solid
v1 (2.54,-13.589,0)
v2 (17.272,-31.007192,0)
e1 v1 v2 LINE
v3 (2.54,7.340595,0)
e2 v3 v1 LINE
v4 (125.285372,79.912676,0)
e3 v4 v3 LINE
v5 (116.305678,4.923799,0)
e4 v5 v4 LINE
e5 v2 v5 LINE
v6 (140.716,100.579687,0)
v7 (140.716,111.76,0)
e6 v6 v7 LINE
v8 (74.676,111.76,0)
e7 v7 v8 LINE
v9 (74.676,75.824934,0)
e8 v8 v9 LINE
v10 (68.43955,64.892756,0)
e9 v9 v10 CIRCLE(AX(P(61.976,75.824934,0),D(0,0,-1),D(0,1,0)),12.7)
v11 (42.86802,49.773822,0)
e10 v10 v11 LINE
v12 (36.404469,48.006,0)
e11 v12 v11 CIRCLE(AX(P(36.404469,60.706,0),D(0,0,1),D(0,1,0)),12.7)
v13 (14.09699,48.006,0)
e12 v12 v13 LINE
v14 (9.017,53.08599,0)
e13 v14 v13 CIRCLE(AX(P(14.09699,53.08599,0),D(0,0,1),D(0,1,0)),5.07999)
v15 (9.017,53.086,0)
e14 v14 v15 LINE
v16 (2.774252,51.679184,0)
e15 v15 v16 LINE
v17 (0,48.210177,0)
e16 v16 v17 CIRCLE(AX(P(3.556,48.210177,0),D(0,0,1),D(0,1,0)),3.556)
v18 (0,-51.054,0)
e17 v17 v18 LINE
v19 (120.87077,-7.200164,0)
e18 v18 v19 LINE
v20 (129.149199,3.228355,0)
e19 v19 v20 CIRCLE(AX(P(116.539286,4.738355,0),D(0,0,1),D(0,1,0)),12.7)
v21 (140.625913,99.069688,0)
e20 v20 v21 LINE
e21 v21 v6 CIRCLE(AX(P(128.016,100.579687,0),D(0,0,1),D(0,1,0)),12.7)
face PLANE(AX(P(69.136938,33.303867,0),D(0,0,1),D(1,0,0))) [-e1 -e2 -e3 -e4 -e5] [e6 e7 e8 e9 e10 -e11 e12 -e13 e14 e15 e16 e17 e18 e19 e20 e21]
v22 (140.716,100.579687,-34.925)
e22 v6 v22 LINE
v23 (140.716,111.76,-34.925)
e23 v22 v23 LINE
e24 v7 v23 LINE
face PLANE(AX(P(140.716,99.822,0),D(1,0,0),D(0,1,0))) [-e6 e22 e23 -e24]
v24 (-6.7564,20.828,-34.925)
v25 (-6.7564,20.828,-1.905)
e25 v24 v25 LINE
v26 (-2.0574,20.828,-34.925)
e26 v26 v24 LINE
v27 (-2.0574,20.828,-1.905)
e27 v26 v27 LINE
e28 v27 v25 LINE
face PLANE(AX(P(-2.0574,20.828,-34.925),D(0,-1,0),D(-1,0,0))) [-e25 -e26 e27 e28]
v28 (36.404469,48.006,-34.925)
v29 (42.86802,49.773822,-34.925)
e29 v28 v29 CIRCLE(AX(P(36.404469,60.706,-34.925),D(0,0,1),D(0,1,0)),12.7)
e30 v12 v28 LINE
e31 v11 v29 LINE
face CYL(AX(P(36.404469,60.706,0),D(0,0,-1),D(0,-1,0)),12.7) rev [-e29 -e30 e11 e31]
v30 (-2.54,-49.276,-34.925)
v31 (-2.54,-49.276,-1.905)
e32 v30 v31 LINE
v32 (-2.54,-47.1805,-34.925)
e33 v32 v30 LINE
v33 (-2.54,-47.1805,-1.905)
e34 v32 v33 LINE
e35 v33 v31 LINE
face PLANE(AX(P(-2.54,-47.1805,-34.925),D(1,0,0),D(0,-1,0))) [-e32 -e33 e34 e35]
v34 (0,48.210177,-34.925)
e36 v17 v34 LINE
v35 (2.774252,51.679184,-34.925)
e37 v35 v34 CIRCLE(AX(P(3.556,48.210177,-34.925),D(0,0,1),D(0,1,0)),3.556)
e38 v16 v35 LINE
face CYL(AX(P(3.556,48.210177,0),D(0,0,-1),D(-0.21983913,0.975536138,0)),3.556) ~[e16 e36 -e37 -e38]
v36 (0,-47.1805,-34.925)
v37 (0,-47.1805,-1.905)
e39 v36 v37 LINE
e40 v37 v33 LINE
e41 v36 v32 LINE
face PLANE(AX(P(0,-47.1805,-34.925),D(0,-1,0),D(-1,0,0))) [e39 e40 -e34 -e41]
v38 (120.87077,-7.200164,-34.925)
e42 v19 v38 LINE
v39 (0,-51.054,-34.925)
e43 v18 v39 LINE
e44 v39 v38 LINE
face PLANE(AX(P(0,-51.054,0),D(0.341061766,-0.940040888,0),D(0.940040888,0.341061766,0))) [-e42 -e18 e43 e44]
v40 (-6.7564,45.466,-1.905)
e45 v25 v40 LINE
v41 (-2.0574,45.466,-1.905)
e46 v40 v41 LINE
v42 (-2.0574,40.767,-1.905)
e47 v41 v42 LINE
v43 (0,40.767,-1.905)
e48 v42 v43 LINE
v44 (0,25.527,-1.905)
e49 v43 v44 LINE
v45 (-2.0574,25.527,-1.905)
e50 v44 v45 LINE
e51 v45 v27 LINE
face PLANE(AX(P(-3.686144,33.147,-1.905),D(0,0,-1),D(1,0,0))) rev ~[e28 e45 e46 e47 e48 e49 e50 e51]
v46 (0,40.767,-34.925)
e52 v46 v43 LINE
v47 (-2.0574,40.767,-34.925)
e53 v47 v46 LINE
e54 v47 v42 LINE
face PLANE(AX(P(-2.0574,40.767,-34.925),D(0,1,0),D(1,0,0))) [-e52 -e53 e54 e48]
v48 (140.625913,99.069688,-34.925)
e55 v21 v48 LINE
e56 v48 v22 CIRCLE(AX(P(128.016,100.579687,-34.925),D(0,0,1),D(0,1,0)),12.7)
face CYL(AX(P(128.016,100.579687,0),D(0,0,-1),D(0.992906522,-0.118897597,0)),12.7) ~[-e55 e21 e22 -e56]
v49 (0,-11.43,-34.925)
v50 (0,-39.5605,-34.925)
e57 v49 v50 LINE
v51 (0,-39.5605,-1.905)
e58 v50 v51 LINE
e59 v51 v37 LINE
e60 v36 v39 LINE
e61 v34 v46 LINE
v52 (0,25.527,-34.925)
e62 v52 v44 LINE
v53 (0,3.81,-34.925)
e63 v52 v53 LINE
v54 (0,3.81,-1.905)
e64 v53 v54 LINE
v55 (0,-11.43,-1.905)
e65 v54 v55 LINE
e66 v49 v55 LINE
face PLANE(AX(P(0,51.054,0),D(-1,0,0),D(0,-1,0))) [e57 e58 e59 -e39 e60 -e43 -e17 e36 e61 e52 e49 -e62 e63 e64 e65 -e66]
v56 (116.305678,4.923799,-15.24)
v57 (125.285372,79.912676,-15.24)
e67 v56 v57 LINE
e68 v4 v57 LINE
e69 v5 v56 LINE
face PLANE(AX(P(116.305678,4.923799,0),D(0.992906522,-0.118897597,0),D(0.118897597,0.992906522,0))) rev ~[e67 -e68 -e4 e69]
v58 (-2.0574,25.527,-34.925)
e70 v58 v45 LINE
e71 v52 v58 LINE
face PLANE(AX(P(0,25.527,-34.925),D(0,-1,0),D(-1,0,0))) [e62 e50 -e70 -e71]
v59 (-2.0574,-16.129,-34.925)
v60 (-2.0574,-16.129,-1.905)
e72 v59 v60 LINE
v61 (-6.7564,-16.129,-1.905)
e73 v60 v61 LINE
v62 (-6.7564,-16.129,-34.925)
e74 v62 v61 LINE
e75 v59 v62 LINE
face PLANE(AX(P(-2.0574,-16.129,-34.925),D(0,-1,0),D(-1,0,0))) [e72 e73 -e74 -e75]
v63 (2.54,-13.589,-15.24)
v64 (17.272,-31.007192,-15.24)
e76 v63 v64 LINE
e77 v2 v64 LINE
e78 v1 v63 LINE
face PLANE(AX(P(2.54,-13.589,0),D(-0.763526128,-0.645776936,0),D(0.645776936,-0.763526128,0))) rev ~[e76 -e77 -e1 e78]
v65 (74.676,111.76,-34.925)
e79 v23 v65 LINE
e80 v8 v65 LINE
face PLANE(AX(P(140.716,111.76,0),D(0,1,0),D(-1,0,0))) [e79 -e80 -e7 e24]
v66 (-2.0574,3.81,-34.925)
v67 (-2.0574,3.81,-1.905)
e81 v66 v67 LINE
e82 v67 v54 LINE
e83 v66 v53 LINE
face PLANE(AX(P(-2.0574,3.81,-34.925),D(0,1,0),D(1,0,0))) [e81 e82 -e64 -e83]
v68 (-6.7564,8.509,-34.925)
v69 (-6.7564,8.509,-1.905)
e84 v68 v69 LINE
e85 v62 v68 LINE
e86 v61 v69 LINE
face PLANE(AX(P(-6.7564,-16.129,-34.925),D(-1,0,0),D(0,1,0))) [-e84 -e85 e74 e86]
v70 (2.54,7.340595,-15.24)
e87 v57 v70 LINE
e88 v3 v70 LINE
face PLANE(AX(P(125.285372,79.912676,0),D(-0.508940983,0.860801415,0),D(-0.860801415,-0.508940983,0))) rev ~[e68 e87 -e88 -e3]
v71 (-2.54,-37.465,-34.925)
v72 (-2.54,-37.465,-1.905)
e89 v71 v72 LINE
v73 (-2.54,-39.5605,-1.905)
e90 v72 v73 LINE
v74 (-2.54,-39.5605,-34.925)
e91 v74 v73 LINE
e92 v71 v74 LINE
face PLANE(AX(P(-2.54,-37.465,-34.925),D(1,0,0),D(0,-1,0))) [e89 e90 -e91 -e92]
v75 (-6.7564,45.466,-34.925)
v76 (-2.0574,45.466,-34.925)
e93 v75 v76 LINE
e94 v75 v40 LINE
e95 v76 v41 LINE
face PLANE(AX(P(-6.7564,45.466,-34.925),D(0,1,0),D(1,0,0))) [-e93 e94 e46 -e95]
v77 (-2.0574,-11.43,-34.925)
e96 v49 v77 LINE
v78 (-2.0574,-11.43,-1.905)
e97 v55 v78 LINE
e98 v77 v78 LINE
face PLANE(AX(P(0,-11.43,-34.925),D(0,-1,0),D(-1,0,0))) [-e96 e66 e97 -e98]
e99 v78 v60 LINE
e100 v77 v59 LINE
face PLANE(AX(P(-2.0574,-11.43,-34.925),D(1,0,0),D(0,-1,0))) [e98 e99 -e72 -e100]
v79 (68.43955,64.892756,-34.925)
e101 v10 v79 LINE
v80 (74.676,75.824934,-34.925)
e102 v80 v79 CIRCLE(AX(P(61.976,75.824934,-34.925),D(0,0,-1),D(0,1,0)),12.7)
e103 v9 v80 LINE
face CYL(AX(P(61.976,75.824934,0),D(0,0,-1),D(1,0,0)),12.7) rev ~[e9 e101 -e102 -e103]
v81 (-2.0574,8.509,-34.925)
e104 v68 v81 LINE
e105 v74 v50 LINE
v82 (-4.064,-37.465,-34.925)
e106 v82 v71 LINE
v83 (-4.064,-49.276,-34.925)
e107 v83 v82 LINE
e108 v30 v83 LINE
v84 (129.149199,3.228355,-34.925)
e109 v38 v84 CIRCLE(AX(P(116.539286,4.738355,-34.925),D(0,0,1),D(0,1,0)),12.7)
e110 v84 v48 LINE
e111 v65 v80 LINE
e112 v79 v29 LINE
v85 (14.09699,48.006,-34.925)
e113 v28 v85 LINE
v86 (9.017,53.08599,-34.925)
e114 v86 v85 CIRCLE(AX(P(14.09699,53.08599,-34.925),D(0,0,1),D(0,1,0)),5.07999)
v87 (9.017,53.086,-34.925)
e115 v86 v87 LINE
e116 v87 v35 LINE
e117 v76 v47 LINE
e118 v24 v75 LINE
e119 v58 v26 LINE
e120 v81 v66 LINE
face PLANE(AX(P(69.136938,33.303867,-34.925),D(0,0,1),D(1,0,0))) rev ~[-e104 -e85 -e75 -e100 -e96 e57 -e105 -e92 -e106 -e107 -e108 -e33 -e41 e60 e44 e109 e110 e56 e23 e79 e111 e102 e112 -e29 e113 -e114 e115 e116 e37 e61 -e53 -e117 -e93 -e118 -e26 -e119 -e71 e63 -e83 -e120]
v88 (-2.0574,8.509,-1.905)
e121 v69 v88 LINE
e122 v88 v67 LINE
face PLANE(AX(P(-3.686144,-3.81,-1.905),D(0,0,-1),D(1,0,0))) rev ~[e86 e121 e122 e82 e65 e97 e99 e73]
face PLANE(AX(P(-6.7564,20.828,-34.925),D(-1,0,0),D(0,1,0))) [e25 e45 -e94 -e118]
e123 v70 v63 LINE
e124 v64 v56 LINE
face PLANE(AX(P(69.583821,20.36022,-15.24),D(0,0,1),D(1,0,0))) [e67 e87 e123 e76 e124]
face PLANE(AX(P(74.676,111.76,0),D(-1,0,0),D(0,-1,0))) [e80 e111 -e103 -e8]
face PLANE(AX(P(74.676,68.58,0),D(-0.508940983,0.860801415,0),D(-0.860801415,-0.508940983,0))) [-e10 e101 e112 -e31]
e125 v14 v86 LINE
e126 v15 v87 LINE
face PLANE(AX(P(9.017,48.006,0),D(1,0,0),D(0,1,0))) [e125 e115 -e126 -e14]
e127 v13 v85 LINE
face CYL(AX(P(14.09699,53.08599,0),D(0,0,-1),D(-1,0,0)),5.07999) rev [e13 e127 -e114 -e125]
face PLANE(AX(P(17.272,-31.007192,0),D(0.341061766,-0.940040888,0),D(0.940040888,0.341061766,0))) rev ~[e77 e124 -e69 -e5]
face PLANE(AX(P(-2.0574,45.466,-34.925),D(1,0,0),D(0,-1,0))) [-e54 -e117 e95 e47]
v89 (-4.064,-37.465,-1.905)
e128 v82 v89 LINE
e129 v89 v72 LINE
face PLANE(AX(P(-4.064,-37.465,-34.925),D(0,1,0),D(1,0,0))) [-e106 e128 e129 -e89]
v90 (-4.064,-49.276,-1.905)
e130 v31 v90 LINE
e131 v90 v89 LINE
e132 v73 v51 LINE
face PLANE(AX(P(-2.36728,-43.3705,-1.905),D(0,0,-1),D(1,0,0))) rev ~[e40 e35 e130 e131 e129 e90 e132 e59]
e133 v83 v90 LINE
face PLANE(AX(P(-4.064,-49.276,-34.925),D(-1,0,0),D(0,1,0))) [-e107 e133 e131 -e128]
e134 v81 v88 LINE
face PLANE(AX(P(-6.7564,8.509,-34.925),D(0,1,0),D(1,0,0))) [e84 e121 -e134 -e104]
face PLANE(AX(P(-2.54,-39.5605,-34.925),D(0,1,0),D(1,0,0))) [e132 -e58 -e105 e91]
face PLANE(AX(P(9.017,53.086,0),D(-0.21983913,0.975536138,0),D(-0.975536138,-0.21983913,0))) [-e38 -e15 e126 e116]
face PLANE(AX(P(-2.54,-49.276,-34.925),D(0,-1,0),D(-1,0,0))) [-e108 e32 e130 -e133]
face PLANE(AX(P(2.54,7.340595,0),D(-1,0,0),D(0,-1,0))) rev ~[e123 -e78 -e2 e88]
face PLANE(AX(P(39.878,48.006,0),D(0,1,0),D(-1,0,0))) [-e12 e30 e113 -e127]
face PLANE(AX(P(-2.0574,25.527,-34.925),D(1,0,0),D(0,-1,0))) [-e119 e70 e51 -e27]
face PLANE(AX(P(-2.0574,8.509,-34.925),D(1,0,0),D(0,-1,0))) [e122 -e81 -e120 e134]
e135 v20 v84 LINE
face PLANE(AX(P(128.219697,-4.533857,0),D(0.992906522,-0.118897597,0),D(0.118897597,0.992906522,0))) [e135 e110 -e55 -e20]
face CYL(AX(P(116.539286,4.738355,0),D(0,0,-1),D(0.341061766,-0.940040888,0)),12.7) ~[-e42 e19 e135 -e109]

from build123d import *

# Parameters (mm, degrees)
F1_DEPTH = 34.925
F3_DEPTH = 33.02
F4_R     = 12.7
F5_R     = 5.07999
F6_R     = 3.556
F8_DEPTH = 15.24


# Not quite as in the source:
# - a fillet or chamfer is up to 0.001 mm smaller than in the source, because OpenCascade refuses the exact size


with BuildPart() as f1:
    # F0 (on Top) → F1 (new body)
    with BuildSketch(Plane.XY):
        Polygon((9.017, 53.086), (0, 51.054), (0, -51.054), (128.219697074, -4.5338571988), (140.716, 99.822), (140.716, 111.76), (74.676, 111.76), (74.676, 68.58), (39.878, 48.006), (9.017, 48.006), align=None)
    extrude(amount=-F1_DEPTH)

    # F2 (on face) → F3 (join)
    with BuildSketch(Plane(origin=(0, 0, -34.925), x_dir=(1, 0, 0), z_dir=(0, 0, -1))):
        Polygon((-2.0574, -40.767), (0, -40.767), (0, -25.527), (-2.0574, -25.527), (-2.0574, -20.828), (-6.7564, -20.828), (-6.7564, -45.466), (-2.0574, -45.466), align=None)
        Polygon((-2.54, 39.5605), (0, 39.5605), (0, 47.1805), (-2.54, 47.1805), (-2.54, 49.276), (-4.064, 49.276), (-4.064, 37.465), (-2.54, 37.465), align=None)
        Polygon((-2.0574, -3.81), (0, -3.81), (0, 11.43), (-2.0574, 11.43), (-2.0574, 16.129), (-6.7564, 16.129), (-6.7564, -8.509), (-2.0574, -8.509), align=None)
    extrude(amount=-F3_DEPTH)

    # F4
    f4_edges = [f1.edges().sort_by_distance(p)[0] for p in [
        (39.878, 48.006, -17.4625),
        (74.676, 68.58, -17.4625),
        (128.219697, -4.533857, -17.4625),
        (140.716, 99.822, -17.4625),
    ]]
    fillet(f4_edges, radius=F4_R)

    # F5 (radius 5.08 in the source; OpenCascade refuses exactly that, so slightly less here)
    f5_edges = [f1.edges().sort_by_distance(p)[0] for p in [
        (9.017, 48.006, -17.4625),
    ]]
    fillet(f5_edges, radius=F5_R)

    # F6
    f6_edges = [f1.edges().sort_by_distance(p)[0] for p in [
        (0, 51.054, -17.4625),
    ]]
    fillet(f6_edges, radius=F6_R)

    # F7 (on face) → F8 (cut)
    with BuildSketch(Plane.XY):
        Polygon((116.3056778405, 4.923799024), (125.2853724235, 79.9126762258), (2.54, 7.34059472), (2.54, -13.589), (17.272, -31.0071923946), align=None)
    extrude(amount=-F8_DEPTH, mode=Mode.SUBTRACT)


solid = f1.part
